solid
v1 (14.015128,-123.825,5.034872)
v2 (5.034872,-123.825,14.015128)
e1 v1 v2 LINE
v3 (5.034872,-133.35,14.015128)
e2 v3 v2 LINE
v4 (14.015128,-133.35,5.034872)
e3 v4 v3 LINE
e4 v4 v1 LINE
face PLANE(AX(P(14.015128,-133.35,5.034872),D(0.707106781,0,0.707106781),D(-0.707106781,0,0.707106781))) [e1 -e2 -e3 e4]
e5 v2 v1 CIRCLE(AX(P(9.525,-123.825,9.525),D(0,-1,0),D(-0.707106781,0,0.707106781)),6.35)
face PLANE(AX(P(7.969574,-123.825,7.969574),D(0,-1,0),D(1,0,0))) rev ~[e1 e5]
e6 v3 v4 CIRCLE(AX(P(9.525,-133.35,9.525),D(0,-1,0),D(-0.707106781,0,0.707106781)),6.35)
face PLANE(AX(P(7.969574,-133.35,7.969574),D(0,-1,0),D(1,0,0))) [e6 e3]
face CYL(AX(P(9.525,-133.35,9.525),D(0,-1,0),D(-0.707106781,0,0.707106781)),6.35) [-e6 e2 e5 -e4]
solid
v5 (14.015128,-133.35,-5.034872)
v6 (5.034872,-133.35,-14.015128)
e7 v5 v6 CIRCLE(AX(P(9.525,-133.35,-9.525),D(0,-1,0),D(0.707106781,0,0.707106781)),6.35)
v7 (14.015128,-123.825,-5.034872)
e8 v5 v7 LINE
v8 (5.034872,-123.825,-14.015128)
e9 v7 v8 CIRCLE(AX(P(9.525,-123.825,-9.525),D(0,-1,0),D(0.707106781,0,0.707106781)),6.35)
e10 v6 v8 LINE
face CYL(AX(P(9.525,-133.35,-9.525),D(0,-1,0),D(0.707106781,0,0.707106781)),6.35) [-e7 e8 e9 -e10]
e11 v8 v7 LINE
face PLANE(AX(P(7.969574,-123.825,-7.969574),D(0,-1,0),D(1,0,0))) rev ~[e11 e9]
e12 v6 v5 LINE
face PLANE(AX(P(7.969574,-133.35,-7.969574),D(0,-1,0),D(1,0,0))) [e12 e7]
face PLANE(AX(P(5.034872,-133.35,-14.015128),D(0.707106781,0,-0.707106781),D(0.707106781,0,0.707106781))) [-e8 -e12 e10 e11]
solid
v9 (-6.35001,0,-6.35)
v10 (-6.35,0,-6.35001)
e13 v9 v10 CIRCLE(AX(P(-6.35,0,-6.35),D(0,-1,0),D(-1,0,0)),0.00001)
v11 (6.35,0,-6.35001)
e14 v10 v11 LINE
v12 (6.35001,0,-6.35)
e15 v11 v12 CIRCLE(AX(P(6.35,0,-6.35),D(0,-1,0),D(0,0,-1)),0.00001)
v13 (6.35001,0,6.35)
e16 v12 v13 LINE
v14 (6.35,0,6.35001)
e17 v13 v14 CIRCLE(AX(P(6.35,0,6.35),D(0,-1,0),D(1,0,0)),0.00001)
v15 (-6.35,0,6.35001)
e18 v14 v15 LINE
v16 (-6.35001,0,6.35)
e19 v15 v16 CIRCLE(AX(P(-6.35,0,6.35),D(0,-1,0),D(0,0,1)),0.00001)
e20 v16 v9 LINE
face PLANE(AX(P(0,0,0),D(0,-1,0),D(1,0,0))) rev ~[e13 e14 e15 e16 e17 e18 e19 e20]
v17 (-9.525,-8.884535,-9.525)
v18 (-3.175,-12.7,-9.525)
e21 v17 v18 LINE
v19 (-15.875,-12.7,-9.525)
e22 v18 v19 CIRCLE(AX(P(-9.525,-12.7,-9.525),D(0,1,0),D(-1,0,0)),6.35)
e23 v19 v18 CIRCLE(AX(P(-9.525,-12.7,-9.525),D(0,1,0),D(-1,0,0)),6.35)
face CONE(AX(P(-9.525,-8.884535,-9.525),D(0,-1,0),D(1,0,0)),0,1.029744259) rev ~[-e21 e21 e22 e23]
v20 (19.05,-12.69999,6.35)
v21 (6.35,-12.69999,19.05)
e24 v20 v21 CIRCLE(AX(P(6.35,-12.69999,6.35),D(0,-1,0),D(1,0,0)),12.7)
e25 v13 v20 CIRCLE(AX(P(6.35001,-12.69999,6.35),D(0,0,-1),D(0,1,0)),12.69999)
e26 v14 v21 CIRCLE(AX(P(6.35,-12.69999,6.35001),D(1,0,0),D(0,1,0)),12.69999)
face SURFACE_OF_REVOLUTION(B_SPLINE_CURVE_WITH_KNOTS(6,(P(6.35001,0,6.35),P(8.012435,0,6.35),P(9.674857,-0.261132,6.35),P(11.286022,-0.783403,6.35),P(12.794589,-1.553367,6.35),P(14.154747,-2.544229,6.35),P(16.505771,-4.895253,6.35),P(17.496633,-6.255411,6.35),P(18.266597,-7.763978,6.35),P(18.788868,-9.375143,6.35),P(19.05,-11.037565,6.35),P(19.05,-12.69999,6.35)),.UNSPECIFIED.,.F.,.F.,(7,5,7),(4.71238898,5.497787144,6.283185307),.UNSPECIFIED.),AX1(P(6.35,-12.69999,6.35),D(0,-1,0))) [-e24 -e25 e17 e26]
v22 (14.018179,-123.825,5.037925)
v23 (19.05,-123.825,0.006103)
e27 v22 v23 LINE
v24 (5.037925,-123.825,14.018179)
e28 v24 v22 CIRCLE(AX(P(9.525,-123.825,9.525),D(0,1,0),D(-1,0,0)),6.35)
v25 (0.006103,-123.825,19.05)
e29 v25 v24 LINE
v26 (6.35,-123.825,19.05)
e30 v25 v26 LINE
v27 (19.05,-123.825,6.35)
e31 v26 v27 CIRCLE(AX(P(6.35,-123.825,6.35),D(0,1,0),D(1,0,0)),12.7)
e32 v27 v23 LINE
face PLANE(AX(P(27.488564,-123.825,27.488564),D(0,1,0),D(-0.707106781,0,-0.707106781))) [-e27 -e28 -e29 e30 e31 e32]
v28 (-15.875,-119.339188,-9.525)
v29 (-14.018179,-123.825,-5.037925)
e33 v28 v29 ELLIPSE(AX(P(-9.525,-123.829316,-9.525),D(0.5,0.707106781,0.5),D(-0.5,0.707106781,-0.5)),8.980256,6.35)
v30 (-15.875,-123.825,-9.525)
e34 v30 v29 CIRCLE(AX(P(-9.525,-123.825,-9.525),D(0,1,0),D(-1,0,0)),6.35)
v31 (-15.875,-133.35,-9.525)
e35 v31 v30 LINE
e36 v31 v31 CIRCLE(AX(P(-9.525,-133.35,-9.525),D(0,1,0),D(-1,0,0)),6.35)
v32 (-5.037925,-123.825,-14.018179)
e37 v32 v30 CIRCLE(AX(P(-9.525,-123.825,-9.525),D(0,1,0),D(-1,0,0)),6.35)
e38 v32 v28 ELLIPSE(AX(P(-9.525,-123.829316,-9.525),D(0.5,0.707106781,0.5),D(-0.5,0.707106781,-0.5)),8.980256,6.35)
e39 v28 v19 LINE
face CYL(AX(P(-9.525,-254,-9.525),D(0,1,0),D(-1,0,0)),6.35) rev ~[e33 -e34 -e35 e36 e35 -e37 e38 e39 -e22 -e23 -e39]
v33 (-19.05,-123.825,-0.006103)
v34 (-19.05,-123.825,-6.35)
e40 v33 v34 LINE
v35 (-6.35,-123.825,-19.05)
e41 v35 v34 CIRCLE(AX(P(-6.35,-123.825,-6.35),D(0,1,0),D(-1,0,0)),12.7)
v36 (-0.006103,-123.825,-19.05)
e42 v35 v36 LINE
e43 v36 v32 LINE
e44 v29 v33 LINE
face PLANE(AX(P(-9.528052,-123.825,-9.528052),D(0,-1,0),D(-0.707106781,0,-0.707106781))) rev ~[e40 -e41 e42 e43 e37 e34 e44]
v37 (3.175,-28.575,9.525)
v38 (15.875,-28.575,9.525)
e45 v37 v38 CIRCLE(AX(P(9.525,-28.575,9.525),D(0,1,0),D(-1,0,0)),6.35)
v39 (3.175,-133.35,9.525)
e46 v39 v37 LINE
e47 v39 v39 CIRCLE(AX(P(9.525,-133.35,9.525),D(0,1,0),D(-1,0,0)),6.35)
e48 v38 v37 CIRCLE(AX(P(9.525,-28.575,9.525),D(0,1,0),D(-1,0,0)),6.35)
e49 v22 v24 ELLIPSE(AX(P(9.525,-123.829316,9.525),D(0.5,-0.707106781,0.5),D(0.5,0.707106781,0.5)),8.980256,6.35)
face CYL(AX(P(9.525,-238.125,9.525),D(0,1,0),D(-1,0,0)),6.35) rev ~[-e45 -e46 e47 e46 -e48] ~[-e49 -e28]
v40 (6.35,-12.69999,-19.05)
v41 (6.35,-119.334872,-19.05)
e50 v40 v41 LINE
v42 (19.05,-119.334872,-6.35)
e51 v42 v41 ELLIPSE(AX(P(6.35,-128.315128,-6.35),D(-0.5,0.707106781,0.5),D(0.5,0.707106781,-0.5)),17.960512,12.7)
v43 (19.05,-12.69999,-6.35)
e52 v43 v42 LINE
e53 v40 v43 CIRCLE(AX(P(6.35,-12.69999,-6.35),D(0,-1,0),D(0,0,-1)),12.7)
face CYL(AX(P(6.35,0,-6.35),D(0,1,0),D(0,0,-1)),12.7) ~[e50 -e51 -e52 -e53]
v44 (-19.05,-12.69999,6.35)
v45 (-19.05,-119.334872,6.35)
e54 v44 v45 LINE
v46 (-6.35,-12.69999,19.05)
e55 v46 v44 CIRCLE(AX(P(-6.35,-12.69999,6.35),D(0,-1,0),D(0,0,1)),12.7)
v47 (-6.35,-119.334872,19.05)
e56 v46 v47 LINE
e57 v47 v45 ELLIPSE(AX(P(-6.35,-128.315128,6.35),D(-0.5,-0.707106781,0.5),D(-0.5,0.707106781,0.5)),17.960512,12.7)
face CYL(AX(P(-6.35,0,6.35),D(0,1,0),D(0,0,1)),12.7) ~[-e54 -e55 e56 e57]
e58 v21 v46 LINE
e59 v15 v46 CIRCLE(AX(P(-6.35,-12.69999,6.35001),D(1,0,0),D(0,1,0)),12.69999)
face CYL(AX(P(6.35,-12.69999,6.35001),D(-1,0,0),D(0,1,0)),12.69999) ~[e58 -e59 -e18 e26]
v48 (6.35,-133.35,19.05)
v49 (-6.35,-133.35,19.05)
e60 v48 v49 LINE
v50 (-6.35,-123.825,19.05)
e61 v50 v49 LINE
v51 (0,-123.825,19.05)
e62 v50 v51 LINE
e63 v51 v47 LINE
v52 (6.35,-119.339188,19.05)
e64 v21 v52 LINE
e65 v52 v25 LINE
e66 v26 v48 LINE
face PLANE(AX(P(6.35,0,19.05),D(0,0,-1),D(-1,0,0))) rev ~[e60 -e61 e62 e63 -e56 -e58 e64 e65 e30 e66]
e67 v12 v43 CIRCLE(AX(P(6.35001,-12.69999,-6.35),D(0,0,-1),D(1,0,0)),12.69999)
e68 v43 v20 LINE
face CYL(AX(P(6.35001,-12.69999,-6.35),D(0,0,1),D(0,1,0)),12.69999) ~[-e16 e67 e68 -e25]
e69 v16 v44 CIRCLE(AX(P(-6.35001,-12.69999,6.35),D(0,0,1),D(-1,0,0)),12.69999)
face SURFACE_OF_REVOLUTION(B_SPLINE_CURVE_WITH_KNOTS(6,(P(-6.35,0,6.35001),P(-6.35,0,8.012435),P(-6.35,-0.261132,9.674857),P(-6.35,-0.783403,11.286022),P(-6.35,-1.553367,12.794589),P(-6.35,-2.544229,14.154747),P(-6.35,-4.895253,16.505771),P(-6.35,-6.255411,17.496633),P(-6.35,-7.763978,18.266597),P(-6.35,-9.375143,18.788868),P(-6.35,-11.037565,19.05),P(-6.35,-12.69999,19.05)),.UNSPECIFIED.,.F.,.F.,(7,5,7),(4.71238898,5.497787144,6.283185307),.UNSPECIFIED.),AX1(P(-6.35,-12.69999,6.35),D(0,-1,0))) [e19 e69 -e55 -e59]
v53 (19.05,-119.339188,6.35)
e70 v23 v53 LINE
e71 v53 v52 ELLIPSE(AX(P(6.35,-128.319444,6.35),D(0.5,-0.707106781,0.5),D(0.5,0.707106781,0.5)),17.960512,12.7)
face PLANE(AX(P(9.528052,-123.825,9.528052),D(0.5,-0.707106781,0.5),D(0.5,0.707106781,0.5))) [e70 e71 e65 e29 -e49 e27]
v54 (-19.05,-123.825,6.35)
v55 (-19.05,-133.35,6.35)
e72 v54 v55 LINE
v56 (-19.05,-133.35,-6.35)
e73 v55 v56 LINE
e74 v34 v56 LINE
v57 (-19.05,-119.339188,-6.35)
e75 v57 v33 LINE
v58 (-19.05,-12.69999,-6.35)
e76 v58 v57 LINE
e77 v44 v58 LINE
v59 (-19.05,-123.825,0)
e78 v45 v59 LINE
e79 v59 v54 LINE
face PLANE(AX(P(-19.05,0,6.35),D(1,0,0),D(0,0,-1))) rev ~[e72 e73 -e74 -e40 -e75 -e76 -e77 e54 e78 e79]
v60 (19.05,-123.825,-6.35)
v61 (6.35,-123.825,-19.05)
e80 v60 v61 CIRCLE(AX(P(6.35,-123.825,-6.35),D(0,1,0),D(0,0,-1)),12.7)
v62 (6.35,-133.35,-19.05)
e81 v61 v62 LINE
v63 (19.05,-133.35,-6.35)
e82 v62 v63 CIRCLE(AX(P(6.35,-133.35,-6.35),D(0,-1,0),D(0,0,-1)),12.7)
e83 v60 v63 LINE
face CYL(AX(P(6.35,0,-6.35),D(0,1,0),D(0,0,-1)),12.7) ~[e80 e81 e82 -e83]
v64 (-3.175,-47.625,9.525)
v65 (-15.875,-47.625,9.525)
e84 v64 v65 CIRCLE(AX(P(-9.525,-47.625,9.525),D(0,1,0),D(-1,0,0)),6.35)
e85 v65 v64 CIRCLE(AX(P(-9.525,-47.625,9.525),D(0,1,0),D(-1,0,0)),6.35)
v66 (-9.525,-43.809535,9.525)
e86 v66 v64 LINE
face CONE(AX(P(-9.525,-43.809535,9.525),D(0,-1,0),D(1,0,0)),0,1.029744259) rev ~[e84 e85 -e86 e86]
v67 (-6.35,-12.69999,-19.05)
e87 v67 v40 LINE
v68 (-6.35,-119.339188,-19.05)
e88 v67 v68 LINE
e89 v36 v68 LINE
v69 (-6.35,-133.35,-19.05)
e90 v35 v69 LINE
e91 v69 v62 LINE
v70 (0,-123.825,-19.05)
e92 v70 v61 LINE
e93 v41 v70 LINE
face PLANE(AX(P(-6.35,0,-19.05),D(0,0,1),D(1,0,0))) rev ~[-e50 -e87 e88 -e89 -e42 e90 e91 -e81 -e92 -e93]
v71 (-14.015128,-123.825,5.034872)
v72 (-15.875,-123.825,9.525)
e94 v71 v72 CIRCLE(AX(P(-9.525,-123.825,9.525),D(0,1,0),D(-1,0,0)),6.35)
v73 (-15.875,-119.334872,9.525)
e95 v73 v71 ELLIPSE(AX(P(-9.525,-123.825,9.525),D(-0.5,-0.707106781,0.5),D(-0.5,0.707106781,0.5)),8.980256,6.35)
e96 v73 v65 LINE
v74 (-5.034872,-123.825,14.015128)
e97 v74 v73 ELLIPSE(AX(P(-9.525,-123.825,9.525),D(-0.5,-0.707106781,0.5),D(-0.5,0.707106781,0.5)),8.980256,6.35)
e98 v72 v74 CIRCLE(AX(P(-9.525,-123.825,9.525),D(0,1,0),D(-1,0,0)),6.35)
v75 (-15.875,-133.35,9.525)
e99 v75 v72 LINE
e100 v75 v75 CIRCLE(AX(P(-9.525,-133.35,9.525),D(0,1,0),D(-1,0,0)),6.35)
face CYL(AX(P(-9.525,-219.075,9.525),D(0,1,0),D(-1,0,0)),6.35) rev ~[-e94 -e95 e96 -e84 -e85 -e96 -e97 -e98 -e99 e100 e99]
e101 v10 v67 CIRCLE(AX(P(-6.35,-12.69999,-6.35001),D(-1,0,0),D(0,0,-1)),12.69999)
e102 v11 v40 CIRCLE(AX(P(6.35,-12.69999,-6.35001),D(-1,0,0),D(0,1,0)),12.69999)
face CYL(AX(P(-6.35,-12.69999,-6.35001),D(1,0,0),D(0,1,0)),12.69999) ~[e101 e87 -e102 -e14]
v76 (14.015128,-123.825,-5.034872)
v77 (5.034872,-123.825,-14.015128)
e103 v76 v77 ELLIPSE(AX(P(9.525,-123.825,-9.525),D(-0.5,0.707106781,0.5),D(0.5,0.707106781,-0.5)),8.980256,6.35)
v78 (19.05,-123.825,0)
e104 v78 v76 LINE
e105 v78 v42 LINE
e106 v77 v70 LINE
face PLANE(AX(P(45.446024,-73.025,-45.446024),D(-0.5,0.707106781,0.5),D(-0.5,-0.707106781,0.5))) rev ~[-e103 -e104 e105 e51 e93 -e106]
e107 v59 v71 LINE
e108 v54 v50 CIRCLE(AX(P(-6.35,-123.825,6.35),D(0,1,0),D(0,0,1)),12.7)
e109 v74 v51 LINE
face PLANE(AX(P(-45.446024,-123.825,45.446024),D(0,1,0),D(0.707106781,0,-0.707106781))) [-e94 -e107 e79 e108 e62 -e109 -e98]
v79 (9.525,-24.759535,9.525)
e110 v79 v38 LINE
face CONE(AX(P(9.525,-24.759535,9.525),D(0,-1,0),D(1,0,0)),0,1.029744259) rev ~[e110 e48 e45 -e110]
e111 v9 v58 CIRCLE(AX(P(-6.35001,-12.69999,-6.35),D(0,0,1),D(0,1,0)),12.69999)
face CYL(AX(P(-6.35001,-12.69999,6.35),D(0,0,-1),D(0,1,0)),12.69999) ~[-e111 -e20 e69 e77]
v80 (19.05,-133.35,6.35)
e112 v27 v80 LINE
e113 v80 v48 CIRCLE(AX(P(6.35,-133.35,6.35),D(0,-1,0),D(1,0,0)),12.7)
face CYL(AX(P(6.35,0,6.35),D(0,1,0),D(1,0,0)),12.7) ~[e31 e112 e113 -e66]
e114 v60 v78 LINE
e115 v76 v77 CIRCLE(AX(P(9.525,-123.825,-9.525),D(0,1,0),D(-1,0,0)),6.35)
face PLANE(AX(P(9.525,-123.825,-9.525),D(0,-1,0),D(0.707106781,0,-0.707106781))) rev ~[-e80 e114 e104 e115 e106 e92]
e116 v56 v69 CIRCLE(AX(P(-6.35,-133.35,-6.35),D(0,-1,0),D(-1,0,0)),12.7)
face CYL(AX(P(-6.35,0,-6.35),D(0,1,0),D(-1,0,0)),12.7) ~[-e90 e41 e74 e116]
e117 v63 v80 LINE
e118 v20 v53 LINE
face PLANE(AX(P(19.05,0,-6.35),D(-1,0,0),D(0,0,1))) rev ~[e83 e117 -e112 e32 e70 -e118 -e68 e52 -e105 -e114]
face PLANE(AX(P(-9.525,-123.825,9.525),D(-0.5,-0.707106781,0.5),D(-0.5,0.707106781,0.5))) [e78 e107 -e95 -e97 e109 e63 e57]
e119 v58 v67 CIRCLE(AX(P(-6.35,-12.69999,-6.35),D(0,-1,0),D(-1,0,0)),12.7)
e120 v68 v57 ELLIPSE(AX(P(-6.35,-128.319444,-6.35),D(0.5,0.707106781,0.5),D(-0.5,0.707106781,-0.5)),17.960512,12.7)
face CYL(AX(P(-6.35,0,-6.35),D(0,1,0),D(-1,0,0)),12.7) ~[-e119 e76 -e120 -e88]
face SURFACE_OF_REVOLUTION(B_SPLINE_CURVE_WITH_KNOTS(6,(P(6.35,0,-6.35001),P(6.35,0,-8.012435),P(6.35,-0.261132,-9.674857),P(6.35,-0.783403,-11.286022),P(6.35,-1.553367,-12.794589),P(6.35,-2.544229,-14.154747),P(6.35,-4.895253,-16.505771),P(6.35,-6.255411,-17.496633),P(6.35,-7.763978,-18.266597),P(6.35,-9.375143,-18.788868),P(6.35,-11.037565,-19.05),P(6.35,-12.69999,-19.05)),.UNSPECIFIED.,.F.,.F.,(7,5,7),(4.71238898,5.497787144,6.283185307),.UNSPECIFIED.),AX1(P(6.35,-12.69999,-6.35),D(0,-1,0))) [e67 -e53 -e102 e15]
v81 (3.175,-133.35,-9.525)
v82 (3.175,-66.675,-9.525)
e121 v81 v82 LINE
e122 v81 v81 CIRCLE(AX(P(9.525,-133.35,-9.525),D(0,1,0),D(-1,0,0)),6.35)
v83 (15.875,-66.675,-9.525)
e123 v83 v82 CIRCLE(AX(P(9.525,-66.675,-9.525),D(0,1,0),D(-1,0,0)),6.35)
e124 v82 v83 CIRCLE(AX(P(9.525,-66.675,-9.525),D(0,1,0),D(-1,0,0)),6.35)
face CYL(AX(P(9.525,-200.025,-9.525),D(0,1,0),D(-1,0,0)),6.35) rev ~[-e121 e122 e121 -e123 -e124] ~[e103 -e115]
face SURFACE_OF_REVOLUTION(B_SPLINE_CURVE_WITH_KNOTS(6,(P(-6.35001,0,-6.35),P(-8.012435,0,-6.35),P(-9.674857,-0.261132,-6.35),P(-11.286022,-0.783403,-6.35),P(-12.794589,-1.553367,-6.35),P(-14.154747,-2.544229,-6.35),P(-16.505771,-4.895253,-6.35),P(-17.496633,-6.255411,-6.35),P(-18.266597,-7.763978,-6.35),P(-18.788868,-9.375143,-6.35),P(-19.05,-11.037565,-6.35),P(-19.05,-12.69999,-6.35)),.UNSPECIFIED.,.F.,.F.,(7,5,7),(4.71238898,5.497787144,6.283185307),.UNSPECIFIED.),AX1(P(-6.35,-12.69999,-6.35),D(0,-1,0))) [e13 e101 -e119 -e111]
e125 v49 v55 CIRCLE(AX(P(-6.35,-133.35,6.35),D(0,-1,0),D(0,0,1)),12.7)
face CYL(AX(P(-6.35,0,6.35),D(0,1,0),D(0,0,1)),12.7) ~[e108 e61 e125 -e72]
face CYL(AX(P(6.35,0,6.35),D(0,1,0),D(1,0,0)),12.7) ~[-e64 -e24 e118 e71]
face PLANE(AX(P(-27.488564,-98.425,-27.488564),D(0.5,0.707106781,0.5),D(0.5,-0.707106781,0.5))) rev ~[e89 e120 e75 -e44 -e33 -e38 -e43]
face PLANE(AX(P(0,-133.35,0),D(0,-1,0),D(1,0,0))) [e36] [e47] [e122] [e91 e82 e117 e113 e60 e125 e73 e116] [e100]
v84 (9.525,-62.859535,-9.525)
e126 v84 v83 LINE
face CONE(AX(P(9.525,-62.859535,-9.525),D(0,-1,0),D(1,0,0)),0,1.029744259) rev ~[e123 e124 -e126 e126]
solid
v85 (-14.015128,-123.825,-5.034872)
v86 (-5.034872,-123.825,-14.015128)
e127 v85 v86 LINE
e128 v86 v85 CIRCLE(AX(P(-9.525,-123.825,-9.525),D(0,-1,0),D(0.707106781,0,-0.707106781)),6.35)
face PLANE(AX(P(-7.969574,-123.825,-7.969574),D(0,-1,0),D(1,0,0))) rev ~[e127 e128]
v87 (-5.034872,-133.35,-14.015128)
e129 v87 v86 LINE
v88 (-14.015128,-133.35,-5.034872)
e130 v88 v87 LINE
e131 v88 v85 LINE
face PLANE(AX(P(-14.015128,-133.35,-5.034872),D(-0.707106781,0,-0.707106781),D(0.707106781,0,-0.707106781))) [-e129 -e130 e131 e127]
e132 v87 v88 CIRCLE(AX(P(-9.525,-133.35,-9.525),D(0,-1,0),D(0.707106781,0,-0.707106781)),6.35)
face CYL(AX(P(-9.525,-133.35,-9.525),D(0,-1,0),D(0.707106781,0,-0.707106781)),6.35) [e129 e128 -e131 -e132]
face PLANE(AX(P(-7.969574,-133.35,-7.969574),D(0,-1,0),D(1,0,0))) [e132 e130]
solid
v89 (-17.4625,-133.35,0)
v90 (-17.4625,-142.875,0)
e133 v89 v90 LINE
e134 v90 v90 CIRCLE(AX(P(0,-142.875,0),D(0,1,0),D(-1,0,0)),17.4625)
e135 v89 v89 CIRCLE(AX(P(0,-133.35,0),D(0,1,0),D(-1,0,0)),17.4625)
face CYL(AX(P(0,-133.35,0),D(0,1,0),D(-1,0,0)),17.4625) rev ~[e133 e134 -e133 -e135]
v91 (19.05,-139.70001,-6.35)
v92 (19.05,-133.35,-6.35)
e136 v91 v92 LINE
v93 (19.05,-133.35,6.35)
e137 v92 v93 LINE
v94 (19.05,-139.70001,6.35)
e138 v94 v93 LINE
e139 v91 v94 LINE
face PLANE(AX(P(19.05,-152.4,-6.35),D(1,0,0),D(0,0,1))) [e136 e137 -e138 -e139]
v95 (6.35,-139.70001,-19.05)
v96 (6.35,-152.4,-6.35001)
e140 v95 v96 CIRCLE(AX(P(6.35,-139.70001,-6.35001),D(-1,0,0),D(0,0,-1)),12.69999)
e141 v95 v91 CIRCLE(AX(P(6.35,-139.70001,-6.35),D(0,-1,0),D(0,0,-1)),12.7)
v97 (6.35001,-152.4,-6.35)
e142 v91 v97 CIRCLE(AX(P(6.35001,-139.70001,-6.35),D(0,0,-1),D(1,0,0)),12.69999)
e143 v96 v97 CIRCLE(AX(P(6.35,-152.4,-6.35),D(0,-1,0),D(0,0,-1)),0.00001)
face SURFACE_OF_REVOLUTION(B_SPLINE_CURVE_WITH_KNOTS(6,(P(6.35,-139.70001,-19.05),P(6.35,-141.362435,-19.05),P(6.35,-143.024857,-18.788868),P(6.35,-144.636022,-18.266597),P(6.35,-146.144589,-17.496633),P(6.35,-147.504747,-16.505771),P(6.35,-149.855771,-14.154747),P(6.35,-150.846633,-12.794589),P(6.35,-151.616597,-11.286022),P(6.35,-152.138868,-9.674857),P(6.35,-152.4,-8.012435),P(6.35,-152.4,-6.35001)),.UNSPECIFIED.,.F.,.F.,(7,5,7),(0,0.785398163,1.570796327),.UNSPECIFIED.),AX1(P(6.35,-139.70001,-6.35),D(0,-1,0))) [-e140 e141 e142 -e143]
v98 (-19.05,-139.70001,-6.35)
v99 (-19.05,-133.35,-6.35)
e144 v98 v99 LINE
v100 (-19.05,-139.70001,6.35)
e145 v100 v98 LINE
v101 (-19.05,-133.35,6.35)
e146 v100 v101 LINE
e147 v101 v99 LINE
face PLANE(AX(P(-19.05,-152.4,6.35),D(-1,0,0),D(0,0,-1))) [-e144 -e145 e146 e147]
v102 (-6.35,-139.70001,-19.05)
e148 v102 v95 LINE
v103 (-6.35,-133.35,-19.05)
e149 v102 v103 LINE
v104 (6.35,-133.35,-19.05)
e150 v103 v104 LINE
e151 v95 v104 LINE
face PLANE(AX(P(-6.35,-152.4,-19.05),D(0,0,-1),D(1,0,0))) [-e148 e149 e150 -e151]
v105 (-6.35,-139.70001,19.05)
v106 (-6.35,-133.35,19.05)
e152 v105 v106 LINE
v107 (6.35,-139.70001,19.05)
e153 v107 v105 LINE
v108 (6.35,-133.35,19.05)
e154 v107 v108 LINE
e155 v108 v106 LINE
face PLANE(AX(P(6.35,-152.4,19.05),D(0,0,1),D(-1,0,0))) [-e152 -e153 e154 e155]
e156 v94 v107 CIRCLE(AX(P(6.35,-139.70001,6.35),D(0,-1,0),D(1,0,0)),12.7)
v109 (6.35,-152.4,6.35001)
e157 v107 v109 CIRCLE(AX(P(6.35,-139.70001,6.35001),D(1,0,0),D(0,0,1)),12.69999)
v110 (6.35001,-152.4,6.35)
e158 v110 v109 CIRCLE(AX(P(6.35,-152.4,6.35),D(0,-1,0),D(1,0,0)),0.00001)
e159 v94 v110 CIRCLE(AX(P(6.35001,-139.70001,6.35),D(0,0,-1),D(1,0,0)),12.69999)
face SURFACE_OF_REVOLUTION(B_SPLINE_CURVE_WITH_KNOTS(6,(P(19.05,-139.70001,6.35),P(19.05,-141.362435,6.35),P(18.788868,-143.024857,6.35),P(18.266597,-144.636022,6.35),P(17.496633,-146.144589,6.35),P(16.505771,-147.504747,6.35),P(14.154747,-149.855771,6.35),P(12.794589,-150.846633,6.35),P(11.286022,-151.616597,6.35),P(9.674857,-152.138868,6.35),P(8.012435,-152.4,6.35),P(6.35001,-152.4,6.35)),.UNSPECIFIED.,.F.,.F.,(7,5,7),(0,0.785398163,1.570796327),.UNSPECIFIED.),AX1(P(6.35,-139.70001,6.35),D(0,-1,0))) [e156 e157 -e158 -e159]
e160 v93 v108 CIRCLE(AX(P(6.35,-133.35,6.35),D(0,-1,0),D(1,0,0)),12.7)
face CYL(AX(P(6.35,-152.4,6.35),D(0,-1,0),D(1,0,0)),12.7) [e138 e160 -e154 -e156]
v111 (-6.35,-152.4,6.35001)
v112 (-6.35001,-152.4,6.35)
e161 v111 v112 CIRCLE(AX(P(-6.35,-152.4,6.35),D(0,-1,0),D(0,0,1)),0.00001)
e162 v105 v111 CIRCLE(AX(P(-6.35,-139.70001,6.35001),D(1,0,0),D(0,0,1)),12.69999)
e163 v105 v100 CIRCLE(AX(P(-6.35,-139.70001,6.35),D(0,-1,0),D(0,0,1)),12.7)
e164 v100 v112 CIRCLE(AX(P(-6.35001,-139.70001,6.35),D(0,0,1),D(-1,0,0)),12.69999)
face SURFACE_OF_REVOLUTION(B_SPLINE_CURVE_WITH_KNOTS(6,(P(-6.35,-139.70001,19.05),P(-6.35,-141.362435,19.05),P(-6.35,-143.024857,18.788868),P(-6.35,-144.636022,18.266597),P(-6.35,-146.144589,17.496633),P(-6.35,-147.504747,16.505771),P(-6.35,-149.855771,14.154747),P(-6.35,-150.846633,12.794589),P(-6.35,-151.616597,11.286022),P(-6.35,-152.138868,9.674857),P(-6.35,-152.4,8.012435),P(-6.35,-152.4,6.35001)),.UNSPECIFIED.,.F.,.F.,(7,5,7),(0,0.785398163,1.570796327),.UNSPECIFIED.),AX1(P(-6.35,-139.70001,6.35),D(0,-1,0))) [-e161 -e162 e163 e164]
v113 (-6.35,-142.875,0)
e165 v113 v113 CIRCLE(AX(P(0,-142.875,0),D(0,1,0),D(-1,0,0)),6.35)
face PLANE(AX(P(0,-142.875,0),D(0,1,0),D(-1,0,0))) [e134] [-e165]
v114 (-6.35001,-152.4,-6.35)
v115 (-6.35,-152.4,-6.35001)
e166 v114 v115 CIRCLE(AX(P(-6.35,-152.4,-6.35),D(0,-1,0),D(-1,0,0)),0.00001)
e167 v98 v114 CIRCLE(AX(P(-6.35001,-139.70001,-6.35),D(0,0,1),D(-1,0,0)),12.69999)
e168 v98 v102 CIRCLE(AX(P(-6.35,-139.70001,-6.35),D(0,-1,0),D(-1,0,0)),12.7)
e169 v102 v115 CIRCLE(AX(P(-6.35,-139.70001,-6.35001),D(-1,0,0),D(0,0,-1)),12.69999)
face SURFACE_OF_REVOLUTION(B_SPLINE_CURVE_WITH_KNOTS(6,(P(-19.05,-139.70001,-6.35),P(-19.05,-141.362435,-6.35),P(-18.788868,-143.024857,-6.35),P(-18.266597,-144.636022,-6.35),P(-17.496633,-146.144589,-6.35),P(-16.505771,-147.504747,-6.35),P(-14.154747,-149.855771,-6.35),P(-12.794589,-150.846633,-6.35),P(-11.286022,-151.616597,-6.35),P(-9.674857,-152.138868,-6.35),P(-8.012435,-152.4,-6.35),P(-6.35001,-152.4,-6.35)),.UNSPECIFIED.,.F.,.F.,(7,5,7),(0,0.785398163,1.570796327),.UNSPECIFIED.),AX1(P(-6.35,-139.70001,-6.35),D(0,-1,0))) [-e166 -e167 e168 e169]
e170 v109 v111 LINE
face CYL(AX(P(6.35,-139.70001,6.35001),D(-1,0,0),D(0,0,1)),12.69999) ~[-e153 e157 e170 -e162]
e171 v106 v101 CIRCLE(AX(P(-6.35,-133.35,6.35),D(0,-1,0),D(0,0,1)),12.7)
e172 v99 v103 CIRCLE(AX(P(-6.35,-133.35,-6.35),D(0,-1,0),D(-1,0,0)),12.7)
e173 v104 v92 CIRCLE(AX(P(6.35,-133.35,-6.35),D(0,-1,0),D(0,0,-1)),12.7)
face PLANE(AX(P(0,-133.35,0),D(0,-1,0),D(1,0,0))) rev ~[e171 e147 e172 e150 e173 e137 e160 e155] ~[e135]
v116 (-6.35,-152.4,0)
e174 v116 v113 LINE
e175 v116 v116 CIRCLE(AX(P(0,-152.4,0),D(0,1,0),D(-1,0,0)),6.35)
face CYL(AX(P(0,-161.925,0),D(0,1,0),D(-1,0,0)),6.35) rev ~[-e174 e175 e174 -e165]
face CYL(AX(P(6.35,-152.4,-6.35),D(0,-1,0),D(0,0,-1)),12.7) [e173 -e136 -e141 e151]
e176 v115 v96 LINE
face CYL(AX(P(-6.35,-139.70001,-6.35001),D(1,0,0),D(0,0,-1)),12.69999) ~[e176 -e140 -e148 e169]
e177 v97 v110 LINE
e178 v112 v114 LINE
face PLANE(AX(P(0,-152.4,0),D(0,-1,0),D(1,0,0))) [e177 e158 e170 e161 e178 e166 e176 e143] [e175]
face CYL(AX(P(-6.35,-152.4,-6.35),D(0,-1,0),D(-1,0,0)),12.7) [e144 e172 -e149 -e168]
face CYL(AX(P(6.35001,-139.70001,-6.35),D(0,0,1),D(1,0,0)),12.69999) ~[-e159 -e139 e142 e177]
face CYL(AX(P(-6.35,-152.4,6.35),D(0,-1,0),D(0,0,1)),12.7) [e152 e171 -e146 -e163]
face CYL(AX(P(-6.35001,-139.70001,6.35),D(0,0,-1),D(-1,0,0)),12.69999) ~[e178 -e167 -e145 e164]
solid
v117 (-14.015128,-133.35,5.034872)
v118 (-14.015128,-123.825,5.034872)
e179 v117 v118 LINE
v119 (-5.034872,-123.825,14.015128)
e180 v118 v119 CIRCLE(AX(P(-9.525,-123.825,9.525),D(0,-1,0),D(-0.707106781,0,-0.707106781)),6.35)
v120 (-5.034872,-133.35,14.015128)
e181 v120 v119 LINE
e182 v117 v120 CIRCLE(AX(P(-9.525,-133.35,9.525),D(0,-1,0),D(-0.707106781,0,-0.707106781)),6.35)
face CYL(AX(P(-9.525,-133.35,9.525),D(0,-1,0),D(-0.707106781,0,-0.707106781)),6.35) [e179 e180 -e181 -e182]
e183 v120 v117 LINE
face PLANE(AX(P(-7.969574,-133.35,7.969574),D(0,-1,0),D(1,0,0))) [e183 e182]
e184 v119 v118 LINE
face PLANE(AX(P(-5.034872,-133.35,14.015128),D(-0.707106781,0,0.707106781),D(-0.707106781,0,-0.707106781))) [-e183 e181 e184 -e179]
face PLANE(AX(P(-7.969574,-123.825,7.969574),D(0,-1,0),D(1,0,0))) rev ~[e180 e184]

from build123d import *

# Parameters (mm, degrees)
F1_DEPTH  = 133.35
F3_D      = 12.7
F3_DEPTH  = 120.65
F3_TIP    = 3.8154649308
F4_D      = 12.7
F4_DEPTH  = 104.775
F4_TIP    = 3.8154649308
F5_D      = 12.7
F5_DEPTH  = 85.725
F5_TIP    = 3.8154649308
F6_D      = 12.7
F6_DEPTH  = 66.675
F6_TIP    = 3.8154649308
F11_DEPTH = 15.621
F14_DEPTH = 15.875
F17_DEPTH = 9.525
F20_DEPTH = 19.05
F21_R     = 17.4625
F22_DEPTH = 9.525
F24_D     = 12.7
F24_DEPTH = 9.525
F24_TIP   = 3.8154649308
F26_R     = 12.69999
F26_2_R   = 12.69999


# Not quite as in the source:
# - a fillet or chamfer is up to 0.001 mm smaller than in the source, because OpenCascade refuses the exact size
# - a feature of the source that left no trace in its solid (it failed there, or was rolled back) is left out


with BuildPart() as f1:
    # F0 (on Front) → F1 (new body)
    with BuildSketch(Plane.XZ):
        with BuildLine():
            ThreePointArc((19.05, 6.35), (15.3302561211, 15.3302561211), (6.35, 19.05))
            Line((6.35, 19.05), (-6.35, 19.05))
            ThreePointArc((-6.35, 19.05), (-15.3302561211, 15.3302561211), (-19.05, 6.35))
            Line((-19.05, 6.35), (-19.05, -6.35))
            ThreePointArc((-19.05, -6.35), (-15.3302561211, -15.3302561211), (-6.35, -19.05))
            Line((-6.35, -19.05), (6.35, -19.05))
            ThreePointArc((6.35, -19.05), (15.3302561211, -15.3302561211), (19.05, -6.35))
            Line((19.05, -6.35), (19.05, 6.35))
        make_face()
    extrude(amount=F1_DEPTH)

    # F3
    with Locations(Plane.XZ.offset(133.35)):
        with Locations((-9.525, -9.525)):
            Hole(F3_D / 2, depth=F3_DEPTH)
            with Locations((0, 0, -(F3_DEPTH + F3_TIP / 2))):  # 118° drill point
                Cone(0, F3_D / 2, F3_TIP, mode=Mode.SUBTRACT)

    # F4
    with Locations(Plane.XZ.offset(133.35)):
        with Locations((9.525, 9.525)):
            Hole(F4_D / 2, depth=F4_DEPTH)
            with Locations((0, 0, -(F4_DEPTH + F4_TIP / 2))):  # 118° drill point
                Cone(0, F4_D / 2, F4_TIP, mode=Mode.SUBTRACT)

    # F5
    with Locations(Plane.XZ.offset(133.35)):
        with Locations((-9.525, 9.525)):
            Hole(F5_D / 2, depth=F5_DEPTH)
            with Locations((0, 0, -(F5_DEPTH + F5_TIP / 2))):  # 118° drill point
                Cone(0, F5_D / 2, F5_TIP, mode=Mode.SUBTRACT)

    # F6
    with Locations(Plane.XZ.offset(133.35)):
        with Locations((9.525, -9.525)):
            Hole(F6_D / 2, depth=F6_DEPTH)
            with Locations((0, 0, -(F6_DEPTH + F6_TIP / 2))):  # 118° drill point
                Cone(0, F6_D / 2, F6_TIP, mode=Mode.SUBTRACT)

    # F10 (on line) → F11 (cut, symmetric)
    with BuildSketch(Plane(origin=(0, 0, 0), x_dir=(0, 1, 0), z_dir=(0.7071067812, 0, 0.7071067812))):
        Polygon((-123.825, 64.2703841816), (-123.825, 13.4703841816), (-73.025, 64.2703841816), align=None)
        Polygon((-123.825, -64.2703841816), (-73.025, -64.2703841816), (-123.825, -13.4703841816), align=None)
    extrude(amount=F11_DEPTH, both=True, mode=Mode.SUBTRACT)

    # F13 (on line) → F14 (cut, symmetric)
    with BuildSketch(Plane(origin=(0, 0, 0), x_dir=(0.7071067812, 0, 0.7071067812), z_dir=(0.7071067812, 0, -0.7071067812))):
        Polygon((38.8747, 123.825), (13.4747, 123.825), (38.8747, 98.425), align=None)
        Polygon((-38.8747, 123.825), (-38.8747, 98.425), (-13.4747, 123.825), align=None)
    extrude(amount=F14_DEPTH, both=True, mode=Mode.SUBTRACT)

    # F26 (radius 12.7 in the source; OpenCascade refuses exactly that, so slightly less here)
    f26_edges = [f1.edges().sort_by_distance(p)[0] for p in [
        (0, 0, 19.05),
        (19.05, 0, 0),
        (15.330256, 0, 15.330256),
        (-15.330256, 0, 15.330256),
        (-19.05, 0, 0),
        (-15.330256, 0, -15.330256),
        (0, 0, -19.05),
        (15.330256, 0, -15.330256),
    ]]
    fillet(f26_edges, radius=F26_R)


with BuildPart() as f17:
    # F16 (on offset) → F17 (new body)
    with BuildSketch(Plane.XZ.offset(133.35)):
        with BuildLine():
            Line((-5.0348719395, 14.0151280605), (-14.0151280605, 5.0348719395))
            ThreePointArc((-14.0151280605, 5.0348719395), (-5.0348719395, 5.0348719395), (-5.0348719395, 14.0151280605))
        make_face()
    extrude(amount=-F17_DEPTH)


with BuildPart() as f17b:
    # F16 (on offset) → F17, piece 2 (new body)
    with BuildSketch(Plane.XZ.offset(133.35)):
        with BuildLine():
            Line((14.0151280605, 5.0348719395), (5.0348719395, 14.0151280605))
            ThreePointArc((5.0348719395, 14.0151280605), (5.0348719395, 5.0348719395), (14.0151280605, 5.0348719395))
        make_face()
    extrude(amount=-F17_DEPTH)


with BuildPart() as f17c:
    # F16 (on offset) → F17, piece 3 (new body)
    with BuildSketch(Plane.XZ.offset(133.35)):
        with BuildLine():
            Line((5.0348719395, -14.0151280605), (14.0151280605, -5.0348719395))
            ThreePointArc((14.0151280605, -5.0348719395), (5.0348719395, -5.0348719395), (5.0348719395, -14.0151280605))
        make_face()
    extrude(amount=-F17_DEPTH)


with BuildPart() as f17d:
    # F16 (on offset) → F17, piece 4 (new body)
    with BuildSketch(Plane.XZ.offset(133.35)):
        with BuildLine():
            Line((-14.0151280605, -5.0348719395), (-5.0348719395, -14.0151280605))
            ThreePointArc((-5.0348719395, -14.0151280605), (-5.0348719395, -5.0348719395), (-14.0151280605, -5.0348719395))
        make_face()
    extrude(amount=-F17_DEPTH)


with BuildPart() as f20:
    # F19 (on offset) → F20 (new body)
    with BuildSketch(Plane.XZ.offset(152.4)):
        with BuildLine():
            Line((-6.35, -19.05), (6.35, -19.05))
            ThreePointArc((6.35, -19.05), (15.3302561211, -15.3302561211), (19.05, -6.35))
            Line((19.05, -6.35), (19.05, 6.35))
            ThreePointArc((19.05, 6.35), (15.3302561211, 15.3302561211), (6.35, 19.05))
            Line((6.35, 19.05), (-6.35, 19.05))
            ThreePointArc((-6.35, 19.05), (-15.3302561211, 15.3302561211), (-19.05, 6.35))
            Line((-19.05, 6.35), (-19.05, -6.35))
            ThreePointArc((-19.05, -6.35), (-15.3302561211, -15.3302561211), (-6.35, -19.05))
        make_face()
    extrude(amount=-F20_DEPTH)

    # F21 (on face) → F22 (cut)
    with BuildSketch(Plane(origin=(0, -133.35, 0), x_dir=(-1, 0, 0), z_dir=(0, 1, 0))):
        Circle(F21_R)
    extrude(amount=-F22_DEPTH, mode=Mode.SUBTRACT)

    # F24
    with Locations(Plane.XZ.offset(152.4)):
        with Locations((0, 0)):
            Hole(F24_D / 2, depth=F24_DEPTH)
            with Locations((0, 0, -(F24_DEPTH + F24_TIP / 2))):  # 118° drill point
                Cone(0, F24_D / 2, F24_TIP, mode=Mode.SUBTRACT)

    # F26#2 (radius 12.7 in the source; OpenCascade refuses exactly that, so slightly less here)
    f26_2_edges = [f20.edges().sort_by_distance(p)[0] for p in [
        (0, -152.4, 19.05),
        (-19.05, -152.4, 0),
        (-15.330256, -152.4, 15.330256),
        (-15.330256, -152.4, -15.330256),
        (0, -152.4, -19.05),
        (15.330256, -152.4, 15.330256),
        (15.330256, -152.4, -15.330256),
        (19.05, -152.4, 0),
    ]]
    fillet(f26_2_edges, radius=F26_2_R)


solid = Compound([f1.part, f17.part, f17b.part, f17c.part, f17d.part, f20.part])
